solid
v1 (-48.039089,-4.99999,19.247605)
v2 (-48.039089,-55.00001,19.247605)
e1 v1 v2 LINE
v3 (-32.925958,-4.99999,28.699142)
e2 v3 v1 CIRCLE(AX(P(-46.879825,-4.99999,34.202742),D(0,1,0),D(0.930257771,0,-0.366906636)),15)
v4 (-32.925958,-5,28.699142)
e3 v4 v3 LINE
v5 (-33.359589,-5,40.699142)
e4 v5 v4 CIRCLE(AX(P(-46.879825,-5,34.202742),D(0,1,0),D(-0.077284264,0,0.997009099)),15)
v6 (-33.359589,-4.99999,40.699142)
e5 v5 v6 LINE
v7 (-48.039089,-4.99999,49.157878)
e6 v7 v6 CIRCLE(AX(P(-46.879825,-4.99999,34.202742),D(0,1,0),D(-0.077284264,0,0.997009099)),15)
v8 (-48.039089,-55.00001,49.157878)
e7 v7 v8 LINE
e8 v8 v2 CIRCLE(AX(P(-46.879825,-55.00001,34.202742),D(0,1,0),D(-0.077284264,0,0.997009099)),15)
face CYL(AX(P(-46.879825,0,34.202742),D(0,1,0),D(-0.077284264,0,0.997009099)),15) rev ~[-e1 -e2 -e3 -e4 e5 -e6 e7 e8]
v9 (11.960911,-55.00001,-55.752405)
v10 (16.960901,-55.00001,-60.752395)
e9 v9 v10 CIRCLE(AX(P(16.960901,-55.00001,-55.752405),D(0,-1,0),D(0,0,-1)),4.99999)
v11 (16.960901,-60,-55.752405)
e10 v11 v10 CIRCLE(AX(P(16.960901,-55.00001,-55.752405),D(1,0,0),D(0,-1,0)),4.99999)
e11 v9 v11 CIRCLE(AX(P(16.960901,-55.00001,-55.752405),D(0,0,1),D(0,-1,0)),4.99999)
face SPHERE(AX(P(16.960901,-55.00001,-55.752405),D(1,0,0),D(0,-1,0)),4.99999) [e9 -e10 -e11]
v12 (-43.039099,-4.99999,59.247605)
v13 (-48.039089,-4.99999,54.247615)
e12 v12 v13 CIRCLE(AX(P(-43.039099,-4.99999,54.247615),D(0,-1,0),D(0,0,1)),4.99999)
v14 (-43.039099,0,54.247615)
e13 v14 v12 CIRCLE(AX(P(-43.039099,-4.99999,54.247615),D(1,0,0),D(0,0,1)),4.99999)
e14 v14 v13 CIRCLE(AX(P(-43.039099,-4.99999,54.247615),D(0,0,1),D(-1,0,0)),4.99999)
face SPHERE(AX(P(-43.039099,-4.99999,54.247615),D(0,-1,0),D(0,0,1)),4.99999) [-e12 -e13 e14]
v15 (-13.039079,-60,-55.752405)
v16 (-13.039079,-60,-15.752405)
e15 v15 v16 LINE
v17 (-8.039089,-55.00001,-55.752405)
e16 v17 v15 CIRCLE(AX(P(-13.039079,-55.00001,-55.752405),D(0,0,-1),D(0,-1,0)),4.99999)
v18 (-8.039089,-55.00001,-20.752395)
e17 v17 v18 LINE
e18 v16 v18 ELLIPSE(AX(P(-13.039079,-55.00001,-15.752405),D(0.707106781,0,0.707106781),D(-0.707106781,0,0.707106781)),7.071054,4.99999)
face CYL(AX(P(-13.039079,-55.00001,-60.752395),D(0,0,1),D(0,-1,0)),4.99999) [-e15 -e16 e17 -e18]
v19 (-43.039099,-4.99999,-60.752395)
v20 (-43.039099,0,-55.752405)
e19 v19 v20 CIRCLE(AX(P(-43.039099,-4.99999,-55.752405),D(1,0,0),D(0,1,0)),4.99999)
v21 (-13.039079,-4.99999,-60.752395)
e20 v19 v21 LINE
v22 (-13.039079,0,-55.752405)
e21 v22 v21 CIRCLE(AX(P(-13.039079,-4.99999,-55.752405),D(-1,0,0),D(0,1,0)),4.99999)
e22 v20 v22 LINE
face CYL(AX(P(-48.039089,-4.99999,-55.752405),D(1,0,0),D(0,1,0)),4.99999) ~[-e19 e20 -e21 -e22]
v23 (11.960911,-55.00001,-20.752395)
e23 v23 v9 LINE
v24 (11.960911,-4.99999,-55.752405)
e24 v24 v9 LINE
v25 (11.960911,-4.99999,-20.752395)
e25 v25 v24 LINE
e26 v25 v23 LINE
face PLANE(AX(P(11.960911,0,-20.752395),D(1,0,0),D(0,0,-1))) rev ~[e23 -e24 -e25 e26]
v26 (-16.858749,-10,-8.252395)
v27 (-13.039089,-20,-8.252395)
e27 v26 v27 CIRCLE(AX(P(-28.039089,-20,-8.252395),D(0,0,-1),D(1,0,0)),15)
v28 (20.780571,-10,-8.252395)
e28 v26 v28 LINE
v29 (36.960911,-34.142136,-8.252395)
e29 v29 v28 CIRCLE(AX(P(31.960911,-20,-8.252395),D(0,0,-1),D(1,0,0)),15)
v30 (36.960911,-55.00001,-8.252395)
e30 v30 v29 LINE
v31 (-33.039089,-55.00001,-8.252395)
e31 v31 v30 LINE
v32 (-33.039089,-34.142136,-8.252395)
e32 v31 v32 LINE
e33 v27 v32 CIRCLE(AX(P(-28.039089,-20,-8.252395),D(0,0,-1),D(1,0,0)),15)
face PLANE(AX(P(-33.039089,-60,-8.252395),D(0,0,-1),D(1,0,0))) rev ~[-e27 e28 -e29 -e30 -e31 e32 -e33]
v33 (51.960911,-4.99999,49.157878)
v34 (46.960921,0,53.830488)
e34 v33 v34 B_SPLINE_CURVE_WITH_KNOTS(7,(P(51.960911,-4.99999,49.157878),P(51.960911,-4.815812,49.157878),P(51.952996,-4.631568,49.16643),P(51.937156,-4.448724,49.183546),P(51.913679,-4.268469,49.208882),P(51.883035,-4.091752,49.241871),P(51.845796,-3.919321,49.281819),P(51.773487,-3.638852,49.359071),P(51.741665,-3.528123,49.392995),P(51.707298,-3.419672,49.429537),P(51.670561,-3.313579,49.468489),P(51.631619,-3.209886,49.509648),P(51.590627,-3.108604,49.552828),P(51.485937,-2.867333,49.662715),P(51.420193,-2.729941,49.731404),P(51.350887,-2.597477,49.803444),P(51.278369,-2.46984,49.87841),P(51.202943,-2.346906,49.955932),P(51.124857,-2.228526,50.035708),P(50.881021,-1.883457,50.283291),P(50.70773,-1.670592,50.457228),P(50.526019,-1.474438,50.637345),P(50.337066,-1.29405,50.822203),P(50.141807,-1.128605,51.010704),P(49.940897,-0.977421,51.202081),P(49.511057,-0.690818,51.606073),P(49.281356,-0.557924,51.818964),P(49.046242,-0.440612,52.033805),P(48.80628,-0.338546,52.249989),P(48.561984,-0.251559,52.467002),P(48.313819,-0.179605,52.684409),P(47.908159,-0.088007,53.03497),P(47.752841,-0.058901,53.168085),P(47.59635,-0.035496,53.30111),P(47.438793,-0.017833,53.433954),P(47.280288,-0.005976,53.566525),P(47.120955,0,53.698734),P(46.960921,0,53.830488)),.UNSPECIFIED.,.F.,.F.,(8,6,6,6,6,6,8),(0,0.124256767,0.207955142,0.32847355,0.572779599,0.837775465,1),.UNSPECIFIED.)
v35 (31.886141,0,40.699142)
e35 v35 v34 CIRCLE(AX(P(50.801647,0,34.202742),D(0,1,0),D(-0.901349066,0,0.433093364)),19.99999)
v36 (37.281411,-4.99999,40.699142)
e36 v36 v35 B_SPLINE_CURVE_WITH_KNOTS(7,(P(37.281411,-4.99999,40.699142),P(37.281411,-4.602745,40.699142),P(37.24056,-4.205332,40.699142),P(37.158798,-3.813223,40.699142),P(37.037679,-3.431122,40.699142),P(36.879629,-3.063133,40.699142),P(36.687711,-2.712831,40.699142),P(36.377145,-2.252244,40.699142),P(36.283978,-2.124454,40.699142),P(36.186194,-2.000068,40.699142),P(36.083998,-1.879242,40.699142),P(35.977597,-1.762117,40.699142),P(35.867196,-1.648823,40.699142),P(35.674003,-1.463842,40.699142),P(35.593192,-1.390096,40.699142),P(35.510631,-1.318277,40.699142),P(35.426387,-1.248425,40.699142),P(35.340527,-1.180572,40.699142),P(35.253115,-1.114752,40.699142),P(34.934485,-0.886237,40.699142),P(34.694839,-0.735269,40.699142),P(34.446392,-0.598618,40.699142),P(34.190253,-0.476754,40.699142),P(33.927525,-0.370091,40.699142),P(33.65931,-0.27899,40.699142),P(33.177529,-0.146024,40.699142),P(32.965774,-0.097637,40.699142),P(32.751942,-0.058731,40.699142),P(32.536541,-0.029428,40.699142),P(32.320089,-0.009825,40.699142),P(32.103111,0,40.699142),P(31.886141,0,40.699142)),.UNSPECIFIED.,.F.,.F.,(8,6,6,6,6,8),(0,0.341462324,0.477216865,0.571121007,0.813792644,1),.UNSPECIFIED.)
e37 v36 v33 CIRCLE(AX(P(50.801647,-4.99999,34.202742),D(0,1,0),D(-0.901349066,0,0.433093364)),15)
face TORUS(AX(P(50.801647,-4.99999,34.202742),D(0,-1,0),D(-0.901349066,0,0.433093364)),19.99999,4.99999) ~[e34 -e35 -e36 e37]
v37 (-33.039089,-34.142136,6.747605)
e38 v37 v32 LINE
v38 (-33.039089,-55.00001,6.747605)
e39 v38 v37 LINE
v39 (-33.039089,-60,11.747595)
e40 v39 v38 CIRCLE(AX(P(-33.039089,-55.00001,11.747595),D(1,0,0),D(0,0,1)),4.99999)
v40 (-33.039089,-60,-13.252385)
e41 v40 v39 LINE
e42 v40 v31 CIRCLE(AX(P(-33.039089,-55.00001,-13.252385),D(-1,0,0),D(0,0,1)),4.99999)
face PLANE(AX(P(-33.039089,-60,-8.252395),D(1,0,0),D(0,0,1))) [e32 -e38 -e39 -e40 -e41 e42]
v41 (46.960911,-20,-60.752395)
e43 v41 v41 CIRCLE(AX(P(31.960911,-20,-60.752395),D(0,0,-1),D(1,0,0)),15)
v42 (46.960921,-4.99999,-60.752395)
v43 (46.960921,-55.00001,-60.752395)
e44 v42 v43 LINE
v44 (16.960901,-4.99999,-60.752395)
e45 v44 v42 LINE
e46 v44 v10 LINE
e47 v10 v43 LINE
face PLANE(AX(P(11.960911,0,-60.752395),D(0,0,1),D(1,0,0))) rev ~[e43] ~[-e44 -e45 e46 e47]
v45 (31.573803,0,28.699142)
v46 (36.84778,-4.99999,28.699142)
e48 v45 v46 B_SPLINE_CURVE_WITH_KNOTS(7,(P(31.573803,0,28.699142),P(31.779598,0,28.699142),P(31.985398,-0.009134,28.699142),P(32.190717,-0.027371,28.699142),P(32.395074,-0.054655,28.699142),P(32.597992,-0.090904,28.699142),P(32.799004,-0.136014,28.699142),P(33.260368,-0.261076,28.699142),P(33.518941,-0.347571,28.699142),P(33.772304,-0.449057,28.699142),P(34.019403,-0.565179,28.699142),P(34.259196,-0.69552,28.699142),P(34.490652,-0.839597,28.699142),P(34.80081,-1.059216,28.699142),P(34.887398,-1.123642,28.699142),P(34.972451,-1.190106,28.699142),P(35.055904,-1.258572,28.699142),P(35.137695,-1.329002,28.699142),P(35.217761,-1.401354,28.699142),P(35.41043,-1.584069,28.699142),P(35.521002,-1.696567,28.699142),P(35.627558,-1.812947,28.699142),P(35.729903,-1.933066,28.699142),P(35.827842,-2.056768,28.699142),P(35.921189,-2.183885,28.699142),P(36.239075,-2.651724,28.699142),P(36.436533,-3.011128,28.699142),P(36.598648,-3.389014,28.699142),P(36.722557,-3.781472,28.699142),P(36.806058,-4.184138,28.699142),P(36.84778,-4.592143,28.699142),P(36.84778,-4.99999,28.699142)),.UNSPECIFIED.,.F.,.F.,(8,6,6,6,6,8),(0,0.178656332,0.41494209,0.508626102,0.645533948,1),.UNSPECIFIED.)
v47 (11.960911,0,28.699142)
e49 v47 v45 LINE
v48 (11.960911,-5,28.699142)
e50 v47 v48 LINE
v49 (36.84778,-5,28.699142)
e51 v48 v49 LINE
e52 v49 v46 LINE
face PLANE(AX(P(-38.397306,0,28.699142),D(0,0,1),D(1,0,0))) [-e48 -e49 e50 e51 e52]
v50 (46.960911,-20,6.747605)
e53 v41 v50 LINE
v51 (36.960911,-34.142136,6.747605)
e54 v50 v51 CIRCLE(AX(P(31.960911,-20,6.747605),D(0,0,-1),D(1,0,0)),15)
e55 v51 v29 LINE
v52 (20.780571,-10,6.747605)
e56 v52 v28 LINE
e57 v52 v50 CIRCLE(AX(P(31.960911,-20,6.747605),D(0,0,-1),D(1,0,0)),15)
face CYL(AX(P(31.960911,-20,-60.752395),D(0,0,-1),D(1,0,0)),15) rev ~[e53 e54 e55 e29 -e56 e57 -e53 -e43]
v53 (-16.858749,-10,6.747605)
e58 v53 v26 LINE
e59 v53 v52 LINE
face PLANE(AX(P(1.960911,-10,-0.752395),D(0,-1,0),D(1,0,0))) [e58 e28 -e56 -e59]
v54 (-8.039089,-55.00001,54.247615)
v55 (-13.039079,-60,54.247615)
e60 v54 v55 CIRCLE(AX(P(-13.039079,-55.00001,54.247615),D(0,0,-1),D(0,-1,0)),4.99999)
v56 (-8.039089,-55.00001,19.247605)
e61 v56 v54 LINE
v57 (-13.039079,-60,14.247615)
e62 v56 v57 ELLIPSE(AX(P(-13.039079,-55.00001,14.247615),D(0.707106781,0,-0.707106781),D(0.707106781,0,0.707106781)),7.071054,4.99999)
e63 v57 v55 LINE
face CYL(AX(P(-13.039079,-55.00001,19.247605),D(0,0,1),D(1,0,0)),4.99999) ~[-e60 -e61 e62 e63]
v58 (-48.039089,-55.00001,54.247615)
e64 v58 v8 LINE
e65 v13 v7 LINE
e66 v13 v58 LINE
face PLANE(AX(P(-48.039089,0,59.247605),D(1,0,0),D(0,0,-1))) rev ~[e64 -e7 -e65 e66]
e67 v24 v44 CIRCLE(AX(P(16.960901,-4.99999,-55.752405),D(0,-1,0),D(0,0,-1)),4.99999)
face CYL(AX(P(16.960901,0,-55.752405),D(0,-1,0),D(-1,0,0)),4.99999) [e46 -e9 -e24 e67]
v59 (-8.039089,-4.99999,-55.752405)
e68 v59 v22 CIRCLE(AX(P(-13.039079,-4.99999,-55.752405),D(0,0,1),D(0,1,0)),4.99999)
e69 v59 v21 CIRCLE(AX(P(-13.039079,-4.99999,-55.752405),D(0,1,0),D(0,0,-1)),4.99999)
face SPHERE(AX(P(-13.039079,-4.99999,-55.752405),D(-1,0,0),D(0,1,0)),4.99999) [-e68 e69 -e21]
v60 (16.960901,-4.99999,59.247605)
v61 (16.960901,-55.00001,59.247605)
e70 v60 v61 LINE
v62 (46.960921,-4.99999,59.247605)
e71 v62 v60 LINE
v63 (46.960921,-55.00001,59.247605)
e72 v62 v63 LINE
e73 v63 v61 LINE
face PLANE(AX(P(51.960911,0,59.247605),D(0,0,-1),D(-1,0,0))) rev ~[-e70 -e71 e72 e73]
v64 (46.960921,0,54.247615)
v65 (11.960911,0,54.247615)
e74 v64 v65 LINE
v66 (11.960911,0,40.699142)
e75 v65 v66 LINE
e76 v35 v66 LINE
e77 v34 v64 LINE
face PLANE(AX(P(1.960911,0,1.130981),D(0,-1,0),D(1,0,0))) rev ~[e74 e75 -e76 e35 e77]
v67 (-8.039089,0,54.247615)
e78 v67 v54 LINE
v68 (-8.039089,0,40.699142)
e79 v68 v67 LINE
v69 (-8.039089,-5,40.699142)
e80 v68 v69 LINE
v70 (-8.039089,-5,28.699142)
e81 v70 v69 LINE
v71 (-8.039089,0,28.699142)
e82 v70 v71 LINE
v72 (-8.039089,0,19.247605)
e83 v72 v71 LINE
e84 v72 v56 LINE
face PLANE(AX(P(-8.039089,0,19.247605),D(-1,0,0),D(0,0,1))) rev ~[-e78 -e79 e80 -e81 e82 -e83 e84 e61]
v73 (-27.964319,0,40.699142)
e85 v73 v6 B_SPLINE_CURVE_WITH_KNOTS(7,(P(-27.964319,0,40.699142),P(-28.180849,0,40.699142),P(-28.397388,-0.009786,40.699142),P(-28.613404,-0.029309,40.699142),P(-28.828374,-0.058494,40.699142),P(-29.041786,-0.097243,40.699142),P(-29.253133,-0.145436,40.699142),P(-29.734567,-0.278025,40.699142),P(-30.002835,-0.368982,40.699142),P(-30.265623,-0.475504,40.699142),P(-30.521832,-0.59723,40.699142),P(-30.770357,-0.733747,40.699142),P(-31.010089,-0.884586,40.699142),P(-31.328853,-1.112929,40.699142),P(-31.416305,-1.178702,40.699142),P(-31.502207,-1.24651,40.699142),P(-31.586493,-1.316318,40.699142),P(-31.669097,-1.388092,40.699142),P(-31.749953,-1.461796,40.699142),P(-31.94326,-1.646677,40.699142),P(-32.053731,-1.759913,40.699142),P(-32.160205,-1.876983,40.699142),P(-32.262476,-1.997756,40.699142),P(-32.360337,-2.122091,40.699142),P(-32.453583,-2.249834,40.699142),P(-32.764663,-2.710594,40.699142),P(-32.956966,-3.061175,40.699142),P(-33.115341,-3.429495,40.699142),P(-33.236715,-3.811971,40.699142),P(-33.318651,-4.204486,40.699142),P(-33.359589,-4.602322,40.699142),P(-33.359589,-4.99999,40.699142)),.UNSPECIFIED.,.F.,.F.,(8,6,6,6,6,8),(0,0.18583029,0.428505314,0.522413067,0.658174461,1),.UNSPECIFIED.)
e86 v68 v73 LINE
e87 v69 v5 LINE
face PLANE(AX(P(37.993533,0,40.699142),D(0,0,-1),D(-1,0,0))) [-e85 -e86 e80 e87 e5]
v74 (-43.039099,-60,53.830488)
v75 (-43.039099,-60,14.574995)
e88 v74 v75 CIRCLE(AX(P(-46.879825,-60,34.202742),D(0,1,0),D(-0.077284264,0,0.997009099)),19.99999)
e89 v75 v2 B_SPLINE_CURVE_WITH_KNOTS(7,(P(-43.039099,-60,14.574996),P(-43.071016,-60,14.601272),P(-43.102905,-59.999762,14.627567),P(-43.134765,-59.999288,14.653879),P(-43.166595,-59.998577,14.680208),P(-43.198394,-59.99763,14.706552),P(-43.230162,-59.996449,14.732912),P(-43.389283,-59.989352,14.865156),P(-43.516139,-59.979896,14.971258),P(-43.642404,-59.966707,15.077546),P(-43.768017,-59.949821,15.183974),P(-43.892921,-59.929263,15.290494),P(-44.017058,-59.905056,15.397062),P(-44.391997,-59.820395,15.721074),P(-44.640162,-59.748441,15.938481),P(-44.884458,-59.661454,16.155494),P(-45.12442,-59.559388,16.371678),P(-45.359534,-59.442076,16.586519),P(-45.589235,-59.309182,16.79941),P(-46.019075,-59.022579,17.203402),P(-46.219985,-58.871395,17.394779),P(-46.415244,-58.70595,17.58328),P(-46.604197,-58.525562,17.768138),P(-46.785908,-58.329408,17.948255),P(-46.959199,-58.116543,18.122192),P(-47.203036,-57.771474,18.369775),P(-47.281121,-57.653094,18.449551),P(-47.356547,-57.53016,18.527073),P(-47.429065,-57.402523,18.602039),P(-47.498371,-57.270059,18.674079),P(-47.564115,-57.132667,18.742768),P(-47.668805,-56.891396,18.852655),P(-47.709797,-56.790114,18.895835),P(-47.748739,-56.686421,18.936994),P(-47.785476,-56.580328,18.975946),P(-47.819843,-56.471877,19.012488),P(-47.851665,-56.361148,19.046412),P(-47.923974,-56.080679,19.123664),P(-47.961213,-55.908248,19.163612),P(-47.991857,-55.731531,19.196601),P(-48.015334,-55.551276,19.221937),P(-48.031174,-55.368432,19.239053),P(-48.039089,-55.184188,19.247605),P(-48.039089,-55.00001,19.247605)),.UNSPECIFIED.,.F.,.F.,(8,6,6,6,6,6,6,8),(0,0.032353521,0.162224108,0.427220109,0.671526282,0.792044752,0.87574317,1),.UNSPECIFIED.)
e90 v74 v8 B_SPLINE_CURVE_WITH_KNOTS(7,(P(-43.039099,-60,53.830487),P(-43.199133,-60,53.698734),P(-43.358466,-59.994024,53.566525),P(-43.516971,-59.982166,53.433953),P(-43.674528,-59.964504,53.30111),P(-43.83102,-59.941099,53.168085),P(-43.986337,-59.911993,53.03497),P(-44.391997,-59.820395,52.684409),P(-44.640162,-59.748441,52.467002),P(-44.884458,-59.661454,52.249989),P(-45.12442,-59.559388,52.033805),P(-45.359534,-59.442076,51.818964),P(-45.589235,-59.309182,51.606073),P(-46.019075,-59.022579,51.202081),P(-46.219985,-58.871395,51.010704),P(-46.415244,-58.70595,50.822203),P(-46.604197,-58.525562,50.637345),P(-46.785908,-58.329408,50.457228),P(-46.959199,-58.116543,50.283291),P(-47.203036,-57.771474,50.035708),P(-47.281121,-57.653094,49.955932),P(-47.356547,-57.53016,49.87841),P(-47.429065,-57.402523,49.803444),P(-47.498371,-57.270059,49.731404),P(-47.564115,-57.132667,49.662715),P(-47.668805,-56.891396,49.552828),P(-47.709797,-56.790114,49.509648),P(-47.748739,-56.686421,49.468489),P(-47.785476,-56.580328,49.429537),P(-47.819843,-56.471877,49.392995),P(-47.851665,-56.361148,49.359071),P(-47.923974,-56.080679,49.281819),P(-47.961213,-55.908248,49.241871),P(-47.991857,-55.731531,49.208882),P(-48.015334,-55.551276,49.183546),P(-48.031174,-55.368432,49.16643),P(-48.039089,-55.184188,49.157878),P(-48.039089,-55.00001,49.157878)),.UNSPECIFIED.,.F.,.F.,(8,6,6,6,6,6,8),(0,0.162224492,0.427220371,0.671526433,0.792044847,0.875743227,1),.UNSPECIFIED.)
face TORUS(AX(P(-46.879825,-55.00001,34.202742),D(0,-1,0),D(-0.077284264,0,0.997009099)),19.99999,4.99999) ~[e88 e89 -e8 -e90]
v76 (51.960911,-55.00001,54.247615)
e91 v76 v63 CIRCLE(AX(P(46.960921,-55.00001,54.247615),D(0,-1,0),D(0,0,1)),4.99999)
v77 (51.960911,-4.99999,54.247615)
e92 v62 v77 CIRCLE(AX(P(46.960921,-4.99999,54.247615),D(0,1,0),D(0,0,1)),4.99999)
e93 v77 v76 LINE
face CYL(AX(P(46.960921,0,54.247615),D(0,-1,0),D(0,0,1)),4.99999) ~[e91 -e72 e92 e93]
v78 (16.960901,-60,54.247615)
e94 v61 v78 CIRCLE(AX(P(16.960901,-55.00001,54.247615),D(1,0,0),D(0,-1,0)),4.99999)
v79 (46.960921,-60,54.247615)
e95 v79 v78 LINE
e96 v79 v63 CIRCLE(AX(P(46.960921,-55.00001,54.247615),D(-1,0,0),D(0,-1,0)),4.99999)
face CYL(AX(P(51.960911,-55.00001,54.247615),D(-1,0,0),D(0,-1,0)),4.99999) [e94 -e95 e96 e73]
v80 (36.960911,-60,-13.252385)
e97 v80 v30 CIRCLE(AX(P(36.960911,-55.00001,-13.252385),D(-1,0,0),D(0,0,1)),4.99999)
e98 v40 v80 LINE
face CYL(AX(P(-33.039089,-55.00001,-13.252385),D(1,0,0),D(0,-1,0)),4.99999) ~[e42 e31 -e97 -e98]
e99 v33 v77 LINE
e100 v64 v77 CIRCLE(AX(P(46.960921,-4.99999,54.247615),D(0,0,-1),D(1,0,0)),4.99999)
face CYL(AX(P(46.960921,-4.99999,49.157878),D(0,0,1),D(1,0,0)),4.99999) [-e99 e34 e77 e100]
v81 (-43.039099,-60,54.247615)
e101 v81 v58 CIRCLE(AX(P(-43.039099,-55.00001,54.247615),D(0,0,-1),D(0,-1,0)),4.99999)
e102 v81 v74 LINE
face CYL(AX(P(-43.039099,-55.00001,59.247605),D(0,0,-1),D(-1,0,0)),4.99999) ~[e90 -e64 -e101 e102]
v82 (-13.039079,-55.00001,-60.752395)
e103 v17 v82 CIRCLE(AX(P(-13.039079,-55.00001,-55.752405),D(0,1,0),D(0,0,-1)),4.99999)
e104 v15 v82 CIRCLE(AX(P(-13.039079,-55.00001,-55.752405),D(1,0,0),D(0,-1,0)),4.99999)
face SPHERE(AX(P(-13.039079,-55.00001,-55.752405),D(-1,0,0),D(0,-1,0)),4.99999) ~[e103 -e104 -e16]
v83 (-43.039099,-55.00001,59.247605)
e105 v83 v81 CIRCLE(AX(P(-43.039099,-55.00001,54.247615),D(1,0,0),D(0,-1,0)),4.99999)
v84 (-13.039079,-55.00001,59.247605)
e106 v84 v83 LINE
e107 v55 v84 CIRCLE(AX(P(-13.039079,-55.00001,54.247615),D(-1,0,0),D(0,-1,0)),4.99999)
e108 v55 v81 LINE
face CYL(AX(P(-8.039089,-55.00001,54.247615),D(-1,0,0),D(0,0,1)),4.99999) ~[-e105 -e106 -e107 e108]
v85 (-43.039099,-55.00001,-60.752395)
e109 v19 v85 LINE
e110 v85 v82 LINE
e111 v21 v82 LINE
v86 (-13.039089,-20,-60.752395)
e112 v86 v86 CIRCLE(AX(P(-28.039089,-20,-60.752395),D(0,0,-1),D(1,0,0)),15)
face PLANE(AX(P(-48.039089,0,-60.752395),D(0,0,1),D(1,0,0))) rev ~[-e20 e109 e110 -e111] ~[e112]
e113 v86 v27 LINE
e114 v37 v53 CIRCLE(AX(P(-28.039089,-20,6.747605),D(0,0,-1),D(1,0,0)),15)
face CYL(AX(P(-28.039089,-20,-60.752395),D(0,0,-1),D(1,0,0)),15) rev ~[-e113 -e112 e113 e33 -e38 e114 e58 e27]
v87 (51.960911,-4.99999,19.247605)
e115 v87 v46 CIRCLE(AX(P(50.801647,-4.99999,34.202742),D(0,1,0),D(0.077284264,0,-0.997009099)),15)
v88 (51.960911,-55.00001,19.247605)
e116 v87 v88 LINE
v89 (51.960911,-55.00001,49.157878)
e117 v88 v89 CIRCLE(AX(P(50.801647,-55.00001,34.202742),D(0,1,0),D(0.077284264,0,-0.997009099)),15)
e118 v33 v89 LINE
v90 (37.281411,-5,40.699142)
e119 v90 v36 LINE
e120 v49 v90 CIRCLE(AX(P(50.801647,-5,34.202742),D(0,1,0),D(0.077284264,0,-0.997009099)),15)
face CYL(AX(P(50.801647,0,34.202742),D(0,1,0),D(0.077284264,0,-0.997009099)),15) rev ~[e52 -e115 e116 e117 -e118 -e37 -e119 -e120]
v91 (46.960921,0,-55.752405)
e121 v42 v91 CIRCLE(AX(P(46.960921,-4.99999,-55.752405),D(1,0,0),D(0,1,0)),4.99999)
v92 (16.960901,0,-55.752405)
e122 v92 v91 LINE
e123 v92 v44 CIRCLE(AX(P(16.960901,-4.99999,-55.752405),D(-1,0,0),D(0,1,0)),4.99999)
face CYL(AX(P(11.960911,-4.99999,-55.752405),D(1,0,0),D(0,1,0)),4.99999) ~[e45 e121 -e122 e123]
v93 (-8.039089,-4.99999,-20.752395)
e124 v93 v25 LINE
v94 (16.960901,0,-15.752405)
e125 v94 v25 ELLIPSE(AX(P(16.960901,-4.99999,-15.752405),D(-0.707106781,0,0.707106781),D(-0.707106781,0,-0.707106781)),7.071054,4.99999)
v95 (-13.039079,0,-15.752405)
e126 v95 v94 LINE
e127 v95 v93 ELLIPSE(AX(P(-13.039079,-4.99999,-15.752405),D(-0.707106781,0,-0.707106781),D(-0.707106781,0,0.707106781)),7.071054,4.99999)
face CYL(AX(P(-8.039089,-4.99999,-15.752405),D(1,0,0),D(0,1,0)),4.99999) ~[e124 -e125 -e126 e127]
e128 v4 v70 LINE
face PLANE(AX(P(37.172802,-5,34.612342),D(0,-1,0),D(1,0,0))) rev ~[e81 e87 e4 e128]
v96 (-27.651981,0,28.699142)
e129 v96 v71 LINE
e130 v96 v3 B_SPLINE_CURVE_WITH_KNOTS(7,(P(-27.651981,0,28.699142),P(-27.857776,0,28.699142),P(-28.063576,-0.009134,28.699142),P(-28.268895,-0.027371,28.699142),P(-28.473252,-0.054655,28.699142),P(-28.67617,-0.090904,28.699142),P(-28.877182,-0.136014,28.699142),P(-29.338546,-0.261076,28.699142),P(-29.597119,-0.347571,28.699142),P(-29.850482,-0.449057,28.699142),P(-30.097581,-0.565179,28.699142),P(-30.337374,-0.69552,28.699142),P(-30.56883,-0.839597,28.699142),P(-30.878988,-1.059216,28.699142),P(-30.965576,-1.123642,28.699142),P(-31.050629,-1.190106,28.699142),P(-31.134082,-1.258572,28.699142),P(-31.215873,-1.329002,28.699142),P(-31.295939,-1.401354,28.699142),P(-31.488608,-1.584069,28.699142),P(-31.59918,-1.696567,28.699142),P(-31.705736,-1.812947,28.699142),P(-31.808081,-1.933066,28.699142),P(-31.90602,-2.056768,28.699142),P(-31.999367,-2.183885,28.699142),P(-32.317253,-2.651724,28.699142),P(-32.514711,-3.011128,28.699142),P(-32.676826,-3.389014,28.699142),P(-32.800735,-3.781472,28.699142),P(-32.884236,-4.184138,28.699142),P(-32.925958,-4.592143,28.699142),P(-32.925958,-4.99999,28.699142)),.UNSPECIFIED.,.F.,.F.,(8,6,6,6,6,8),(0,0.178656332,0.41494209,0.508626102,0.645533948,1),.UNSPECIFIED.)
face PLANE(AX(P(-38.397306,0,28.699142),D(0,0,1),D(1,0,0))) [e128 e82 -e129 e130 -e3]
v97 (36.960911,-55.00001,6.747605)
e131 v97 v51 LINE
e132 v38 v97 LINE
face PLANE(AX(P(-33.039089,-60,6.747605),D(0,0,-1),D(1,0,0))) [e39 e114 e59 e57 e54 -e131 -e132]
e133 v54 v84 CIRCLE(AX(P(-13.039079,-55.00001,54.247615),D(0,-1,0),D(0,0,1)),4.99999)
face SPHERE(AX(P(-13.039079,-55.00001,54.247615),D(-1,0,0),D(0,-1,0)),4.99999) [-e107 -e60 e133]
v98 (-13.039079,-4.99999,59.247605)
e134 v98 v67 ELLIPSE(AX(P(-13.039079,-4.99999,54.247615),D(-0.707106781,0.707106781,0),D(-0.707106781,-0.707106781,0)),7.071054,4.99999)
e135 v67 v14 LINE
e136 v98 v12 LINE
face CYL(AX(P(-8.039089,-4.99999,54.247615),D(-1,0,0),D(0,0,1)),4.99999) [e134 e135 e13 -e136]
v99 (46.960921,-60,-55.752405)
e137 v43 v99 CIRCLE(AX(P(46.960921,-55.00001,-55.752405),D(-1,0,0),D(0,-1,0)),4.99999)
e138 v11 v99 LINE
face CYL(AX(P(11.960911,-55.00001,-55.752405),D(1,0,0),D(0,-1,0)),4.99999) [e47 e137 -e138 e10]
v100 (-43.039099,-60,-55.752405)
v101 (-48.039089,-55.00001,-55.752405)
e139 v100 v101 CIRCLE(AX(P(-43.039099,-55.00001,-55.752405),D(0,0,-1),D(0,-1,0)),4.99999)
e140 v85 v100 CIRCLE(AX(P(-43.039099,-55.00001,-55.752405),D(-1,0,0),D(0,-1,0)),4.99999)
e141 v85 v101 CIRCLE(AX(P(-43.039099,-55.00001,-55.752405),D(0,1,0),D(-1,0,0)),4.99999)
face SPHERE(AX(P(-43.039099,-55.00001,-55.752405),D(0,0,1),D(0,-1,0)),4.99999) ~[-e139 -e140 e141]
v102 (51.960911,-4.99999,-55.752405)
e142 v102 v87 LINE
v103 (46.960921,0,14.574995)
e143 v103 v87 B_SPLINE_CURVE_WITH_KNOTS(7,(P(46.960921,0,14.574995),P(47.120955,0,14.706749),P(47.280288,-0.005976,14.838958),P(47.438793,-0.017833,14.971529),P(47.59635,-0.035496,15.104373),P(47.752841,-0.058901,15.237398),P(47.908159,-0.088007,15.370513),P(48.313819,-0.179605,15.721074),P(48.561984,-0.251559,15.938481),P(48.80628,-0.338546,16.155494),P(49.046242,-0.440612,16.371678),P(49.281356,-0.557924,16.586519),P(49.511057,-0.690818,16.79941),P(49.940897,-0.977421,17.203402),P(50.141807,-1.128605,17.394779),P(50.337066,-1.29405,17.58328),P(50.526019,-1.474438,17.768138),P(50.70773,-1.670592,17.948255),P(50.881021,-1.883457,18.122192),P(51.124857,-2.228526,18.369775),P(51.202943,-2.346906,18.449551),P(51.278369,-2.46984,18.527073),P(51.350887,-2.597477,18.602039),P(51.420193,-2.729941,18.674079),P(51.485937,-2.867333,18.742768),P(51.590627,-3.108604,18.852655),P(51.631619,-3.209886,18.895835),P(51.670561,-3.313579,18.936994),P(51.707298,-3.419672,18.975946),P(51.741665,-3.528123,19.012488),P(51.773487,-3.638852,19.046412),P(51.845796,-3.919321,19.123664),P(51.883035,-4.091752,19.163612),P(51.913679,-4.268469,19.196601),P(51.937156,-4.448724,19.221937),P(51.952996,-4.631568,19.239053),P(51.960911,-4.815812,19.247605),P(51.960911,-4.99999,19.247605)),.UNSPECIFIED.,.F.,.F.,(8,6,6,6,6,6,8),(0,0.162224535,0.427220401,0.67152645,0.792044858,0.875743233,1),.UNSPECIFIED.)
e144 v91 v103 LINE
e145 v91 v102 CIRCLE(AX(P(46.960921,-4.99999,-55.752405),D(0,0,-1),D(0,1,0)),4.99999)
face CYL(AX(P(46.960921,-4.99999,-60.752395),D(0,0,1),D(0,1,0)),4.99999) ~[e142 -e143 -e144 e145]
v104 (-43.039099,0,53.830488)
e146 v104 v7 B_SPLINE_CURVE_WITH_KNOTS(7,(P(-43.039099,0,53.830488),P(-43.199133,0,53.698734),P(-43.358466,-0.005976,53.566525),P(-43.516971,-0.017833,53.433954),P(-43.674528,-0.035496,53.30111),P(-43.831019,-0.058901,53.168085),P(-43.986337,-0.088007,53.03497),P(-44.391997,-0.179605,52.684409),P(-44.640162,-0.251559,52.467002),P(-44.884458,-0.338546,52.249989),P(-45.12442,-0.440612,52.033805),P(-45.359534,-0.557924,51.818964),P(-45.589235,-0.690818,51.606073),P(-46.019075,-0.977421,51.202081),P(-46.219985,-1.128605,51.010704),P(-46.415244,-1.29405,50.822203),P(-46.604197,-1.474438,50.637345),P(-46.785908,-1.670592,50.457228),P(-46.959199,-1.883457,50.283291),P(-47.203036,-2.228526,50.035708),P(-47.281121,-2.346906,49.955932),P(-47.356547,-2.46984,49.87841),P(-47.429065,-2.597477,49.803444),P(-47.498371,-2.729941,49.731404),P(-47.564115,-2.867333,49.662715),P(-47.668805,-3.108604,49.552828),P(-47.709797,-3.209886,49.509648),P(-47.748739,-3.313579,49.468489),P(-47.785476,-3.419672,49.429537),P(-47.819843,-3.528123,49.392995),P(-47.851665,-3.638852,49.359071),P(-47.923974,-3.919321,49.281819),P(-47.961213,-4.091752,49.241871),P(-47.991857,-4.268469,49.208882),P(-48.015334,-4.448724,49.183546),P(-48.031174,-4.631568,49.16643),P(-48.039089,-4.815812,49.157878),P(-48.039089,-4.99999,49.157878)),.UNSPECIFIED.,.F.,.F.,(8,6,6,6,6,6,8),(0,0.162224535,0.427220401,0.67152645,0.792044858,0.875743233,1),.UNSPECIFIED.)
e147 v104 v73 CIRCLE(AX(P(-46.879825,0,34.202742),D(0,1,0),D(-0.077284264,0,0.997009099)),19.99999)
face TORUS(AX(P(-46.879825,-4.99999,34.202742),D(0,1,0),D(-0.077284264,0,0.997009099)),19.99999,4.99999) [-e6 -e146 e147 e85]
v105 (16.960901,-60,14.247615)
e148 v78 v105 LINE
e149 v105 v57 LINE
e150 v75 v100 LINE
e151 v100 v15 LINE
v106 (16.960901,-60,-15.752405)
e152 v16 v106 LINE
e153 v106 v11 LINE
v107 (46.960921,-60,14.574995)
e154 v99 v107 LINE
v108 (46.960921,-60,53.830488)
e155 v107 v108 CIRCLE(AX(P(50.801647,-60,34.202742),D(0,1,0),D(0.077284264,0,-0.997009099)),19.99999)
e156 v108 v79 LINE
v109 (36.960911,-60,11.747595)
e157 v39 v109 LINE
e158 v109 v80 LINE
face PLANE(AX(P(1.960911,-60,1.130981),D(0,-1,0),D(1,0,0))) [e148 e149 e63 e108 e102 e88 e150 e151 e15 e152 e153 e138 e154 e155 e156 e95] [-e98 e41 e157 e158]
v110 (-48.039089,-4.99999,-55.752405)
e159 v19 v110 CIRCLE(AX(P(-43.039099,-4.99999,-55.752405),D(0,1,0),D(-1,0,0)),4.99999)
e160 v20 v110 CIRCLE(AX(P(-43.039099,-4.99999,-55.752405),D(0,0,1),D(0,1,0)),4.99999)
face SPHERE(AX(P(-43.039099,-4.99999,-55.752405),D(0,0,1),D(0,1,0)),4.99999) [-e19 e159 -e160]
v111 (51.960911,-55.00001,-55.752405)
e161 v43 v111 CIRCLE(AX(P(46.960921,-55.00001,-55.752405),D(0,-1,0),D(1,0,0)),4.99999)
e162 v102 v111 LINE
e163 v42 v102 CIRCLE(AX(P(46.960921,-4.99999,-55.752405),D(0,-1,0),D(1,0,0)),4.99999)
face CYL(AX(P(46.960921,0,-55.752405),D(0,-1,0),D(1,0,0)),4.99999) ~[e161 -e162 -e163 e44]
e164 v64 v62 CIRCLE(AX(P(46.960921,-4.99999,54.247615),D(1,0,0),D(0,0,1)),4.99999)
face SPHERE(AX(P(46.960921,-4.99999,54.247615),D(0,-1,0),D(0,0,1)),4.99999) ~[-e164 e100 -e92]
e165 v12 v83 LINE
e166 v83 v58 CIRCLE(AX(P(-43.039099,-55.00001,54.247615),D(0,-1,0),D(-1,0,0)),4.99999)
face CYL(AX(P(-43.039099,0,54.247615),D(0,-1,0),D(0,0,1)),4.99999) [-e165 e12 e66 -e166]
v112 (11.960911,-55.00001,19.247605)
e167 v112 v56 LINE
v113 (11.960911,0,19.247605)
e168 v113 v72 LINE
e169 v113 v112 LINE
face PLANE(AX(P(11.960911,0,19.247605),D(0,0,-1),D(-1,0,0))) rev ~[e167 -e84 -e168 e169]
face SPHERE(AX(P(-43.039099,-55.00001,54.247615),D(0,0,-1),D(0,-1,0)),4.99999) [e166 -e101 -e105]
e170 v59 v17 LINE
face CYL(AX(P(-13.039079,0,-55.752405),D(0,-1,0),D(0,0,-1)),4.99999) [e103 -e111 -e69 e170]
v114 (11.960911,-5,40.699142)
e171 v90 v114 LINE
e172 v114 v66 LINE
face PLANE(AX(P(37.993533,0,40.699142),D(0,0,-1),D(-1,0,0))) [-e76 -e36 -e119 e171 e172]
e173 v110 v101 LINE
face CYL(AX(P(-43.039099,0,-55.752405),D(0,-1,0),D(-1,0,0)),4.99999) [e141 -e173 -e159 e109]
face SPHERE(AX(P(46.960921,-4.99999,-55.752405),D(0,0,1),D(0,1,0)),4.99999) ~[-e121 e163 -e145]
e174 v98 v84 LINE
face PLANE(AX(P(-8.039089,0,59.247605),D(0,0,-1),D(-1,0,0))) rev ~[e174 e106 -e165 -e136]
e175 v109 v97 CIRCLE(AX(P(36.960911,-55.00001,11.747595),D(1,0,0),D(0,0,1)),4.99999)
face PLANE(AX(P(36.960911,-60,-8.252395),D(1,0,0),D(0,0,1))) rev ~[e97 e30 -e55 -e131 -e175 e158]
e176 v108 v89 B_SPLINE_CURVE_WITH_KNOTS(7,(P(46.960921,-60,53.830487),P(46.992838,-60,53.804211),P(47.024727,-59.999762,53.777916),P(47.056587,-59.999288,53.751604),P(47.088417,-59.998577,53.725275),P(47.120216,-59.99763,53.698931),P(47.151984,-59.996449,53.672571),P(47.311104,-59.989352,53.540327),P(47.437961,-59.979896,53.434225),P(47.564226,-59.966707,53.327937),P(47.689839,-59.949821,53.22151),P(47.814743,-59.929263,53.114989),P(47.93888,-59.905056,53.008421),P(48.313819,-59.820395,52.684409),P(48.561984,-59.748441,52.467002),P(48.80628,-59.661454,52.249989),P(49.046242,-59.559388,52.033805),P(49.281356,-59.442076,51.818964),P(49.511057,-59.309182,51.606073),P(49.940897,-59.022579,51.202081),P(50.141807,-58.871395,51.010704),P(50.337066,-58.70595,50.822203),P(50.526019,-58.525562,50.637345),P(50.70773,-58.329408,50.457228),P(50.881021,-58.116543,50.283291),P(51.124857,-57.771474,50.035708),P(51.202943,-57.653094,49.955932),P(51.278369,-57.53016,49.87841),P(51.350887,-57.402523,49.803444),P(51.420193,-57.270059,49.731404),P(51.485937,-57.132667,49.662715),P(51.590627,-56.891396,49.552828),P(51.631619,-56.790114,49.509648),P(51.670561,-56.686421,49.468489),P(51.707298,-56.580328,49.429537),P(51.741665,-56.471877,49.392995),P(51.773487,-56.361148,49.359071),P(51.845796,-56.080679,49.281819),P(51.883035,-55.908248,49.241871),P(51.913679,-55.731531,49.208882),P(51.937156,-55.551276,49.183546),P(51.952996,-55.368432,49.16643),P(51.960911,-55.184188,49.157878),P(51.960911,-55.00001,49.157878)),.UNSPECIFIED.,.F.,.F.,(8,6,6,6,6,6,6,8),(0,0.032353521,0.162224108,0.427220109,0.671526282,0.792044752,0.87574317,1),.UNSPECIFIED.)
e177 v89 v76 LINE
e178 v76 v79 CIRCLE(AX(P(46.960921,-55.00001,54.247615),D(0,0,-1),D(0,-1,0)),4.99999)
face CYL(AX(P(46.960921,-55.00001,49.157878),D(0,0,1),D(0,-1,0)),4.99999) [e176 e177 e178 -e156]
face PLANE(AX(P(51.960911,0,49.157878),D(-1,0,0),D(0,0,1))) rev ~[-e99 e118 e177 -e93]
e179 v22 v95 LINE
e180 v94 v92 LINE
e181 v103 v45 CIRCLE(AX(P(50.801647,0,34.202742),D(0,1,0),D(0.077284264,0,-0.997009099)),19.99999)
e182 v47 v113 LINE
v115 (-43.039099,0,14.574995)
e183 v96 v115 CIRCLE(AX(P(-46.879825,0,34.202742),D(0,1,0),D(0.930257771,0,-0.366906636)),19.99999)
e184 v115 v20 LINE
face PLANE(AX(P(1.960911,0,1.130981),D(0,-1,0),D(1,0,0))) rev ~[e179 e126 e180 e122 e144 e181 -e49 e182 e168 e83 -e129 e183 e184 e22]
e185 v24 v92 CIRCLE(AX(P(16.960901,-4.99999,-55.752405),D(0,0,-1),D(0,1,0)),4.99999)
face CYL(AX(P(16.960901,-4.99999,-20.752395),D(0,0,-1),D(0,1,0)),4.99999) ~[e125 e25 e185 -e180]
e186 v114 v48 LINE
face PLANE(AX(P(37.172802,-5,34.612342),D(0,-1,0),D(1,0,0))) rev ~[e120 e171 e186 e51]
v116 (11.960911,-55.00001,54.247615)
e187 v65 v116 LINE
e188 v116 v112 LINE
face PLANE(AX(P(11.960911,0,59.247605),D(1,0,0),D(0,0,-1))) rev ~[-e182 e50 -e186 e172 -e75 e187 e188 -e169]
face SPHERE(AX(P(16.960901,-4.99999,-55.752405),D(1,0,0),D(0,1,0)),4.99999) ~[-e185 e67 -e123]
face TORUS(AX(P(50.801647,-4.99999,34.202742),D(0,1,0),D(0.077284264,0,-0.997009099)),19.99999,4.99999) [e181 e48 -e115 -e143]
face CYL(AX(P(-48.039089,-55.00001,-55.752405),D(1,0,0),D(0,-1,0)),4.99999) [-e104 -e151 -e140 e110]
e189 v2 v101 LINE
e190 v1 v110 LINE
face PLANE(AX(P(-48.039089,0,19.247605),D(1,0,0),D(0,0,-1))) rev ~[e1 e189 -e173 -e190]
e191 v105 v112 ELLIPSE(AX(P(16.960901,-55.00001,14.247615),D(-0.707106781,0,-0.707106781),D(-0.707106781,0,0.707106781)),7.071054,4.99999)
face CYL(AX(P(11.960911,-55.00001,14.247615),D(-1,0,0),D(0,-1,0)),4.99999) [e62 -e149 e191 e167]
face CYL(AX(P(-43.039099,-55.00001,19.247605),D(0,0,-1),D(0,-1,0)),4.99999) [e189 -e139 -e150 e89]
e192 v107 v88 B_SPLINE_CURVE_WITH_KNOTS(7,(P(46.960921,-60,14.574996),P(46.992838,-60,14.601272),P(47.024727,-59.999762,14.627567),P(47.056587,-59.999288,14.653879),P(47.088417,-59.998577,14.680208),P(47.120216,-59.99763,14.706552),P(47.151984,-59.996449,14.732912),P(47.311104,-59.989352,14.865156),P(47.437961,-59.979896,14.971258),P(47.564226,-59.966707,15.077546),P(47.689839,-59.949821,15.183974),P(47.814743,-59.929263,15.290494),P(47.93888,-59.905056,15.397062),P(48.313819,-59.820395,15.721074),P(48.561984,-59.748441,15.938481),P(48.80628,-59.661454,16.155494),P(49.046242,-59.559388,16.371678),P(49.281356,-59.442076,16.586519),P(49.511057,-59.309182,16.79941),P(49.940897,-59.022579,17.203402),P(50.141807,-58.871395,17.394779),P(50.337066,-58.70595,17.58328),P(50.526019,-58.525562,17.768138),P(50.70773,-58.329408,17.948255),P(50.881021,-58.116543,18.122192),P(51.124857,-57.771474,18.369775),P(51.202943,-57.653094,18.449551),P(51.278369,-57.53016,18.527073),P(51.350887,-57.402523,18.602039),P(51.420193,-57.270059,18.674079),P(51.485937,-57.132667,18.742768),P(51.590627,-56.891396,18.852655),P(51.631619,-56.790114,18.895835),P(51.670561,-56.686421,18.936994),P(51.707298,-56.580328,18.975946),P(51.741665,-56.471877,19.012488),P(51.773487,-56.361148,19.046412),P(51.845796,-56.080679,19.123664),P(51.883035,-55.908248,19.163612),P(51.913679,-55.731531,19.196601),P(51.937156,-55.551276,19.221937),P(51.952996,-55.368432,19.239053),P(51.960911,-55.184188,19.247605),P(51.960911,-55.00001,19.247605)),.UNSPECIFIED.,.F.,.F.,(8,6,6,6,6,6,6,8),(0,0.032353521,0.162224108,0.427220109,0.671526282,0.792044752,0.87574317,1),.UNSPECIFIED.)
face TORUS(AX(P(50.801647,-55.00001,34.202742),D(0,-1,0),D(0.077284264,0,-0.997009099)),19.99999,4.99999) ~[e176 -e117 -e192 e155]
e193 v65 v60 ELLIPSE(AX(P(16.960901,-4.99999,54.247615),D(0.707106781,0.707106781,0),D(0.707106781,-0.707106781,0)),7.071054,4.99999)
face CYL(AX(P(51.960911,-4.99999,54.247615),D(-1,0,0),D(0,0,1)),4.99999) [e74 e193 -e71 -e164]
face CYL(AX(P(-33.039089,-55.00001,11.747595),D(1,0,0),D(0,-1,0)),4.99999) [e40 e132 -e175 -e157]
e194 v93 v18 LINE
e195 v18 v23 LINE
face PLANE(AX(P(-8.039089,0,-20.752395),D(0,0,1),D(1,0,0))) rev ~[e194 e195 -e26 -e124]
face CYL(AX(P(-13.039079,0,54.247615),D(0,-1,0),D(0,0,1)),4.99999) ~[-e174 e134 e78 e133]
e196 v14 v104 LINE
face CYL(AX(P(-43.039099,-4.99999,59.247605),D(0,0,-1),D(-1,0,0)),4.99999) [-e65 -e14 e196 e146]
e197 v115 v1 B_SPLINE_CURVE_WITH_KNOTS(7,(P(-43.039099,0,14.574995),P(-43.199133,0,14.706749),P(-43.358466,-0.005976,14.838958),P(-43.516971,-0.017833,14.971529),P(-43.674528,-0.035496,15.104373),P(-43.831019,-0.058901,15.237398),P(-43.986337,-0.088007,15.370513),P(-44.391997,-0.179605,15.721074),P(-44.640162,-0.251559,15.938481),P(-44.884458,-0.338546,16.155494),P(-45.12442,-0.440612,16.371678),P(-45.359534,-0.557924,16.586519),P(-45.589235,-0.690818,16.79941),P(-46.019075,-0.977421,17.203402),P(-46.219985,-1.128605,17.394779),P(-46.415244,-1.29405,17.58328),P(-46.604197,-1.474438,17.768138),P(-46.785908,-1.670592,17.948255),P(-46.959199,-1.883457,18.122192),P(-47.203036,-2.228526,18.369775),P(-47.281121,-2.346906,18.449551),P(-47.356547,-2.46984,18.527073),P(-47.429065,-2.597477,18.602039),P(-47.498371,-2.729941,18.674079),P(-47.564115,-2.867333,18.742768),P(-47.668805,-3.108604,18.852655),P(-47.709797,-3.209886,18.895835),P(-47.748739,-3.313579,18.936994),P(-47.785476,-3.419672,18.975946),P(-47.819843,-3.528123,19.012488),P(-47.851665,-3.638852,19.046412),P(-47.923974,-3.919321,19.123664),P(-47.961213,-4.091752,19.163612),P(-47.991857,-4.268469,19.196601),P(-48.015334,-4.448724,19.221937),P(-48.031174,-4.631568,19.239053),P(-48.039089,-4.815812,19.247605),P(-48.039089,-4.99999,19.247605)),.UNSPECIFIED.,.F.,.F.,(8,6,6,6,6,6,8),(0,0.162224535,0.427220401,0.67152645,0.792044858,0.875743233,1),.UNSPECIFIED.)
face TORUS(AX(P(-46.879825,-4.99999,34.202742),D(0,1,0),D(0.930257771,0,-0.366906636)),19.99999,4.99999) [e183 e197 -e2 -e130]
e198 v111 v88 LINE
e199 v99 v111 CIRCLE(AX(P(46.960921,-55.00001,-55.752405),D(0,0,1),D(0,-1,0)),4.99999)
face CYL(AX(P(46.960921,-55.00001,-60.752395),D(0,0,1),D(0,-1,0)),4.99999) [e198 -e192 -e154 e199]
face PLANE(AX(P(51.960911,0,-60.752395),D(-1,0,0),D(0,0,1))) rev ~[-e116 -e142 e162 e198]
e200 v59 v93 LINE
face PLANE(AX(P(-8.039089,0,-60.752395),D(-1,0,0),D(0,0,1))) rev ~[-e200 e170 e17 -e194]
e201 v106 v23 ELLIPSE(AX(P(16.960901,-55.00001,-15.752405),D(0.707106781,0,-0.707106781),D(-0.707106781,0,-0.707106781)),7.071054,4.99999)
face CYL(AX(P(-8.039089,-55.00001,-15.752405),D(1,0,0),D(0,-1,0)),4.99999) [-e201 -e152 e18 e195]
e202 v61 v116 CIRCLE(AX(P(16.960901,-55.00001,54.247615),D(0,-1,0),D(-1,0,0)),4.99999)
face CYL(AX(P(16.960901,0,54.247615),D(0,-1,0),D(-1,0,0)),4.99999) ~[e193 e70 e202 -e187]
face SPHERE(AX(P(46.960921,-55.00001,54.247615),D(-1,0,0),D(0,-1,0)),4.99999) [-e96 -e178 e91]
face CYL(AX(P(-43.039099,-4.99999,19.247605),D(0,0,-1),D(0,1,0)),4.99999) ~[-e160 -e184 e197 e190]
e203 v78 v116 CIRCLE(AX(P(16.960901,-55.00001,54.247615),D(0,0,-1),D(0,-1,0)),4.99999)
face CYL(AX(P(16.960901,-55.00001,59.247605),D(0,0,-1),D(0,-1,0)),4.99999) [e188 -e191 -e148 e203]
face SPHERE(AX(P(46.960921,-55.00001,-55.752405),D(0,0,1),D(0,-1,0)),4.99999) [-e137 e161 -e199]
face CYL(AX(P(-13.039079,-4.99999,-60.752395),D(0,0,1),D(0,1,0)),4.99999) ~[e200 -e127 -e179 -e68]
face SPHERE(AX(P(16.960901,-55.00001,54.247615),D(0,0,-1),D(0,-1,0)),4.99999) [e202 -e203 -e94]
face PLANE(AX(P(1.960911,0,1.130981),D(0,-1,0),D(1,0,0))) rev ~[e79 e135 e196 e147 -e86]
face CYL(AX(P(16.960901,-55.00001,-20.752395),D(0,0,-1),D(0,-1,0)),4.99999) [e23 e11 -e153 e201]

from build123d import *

# Parameters (mm, degrees)
F1_DEPTH = 60
F2_W     = 70
F2_H     = 15
F3_DEPTH = 50
F4_R     = 15
F5_R     = 15
F6_DEPTH = 67.5
F7_W     = 20
F7_H     = 12
F8_DEPTH = 5
F9_R     = 4.99999


# Not quite as in the source:
# - a fillet or chamfer is up to 0.001 mm smaller than in the source, because OpenCascade refuses the exact size


with BuildPart() as f1:
    # F0 (on Front) → F1 (new body)
    with BuildSketch(Plane.XZ):
        with BuildLine():
            Line((-8.0390890029, 59.2476050396), (-48.0390890029, 59.2476050396))
            Line((-48.0390890029, 59.2476050396), (-48.0390890029, 49.1578779955))
            ThreePointArc((-48.0390890029, 49.1578779955), (-31.8798250439, 34.2027415175), (-48.0390890029, 19.2476050396))
            Line((-48.0390890029, 19.2476050396), (-48.0390890029, -60.7523949604))
            Line((-48.0390890029, -60.7523949604), (-8.0390890029, -60.7523949604))
            Line((-8.0390890029, -60.7523949604), (-8.0390890029, -20.7523949604))
            Line((-8.0390890029, -20.7523949604), (11.9609109971, -20.7523949604))
            Line((11.9609109971, -20.7523949604), (11.9609109971, -60.7523949604))
            Line((11.9609109971, -60.7523949604), (51.9609109971, -60.7523949604))
            Line((51.9609109971, -60.7523949604), (51.9609109971, 19.2476050396))
            ThreePointArc((51.9609109971, 19.2476050396), (35.8016470382, 34.2027415175), (51.9609109971, 49.1578779955))
            Line((51.9609109971, 49.1578779955), (51.9609109971, 59.2476050396))
            Line((51.9609109971, 59.2476050396), (11.9609109971, 59.2476050396))
            Line((11.9609109971, 59.2476050396), (11.9609109971, 19.2476050396))
            Line((11.9609109971, 19.2476050396), (-8.0390890029, 19.2476050396))
            Line((-8.0390890029, 19.2476050396), (-8.0390890029, 59.2476050396))
        make_face()
    extrude(amount=F1_DEPTH)

    # F2 (on face) → F3 (cut)
    with BuildSketch(Plane.XZ.offset(60)):
        with Locations((1.9609109971, -0.7523949604)):
            Rectangle(F2_W, F2_H)
    extrude(amount=-F3_DEPTH, mode=Mode.SUBTRACT)

    # F4 (on face) + F5 (on face) → F6 (cut)
    with BuildSketch(Plane(origin=(0, 0, -60.7523949604), x_dir=(1, 0, 0), z_dir=(0, 0, -1))):
        with Locations((-28.0390890029, 20)):
            Circle(F4_R)
    with BuildSketch(Plane(origin=(0, 0, -60.7523949604), x_dir=(1, 0, 0), z_dir=(0, 0, -1))):
        with Locations((31.9609109971, 20)):
            Circle(F5_R)
    extrude(amount=-F6_DEPTH, mode=Mode.SUBTRACT)

    # F7 (on face) → F8 (cut)
    with BuildSketch(Plane.XZ):
        with BuildLine():
            Line((37.9935329711, 28.6991419792), (37.9935329711, 40.6991419792))
            Line((37.9935329711, 40.6991419792), (37.281411055, 40.6991419792))
            ThreePointArc((37.281411055, 40.6991419792), (35.811430972, 34.7444261941), (36.8477804729, 28.6991419792))
            Line((36.8477804729, 28.6991419792), (37.9935329711, 28.6991419792))
        make_face()
        with Locations((1.9609109971, 34.6991419792)):
            Rectangle(F7_W, F7_H)
        with BuildLine():
            Line((-8.0390890029, 28.6991419792), (-8.0390890029, 40.6991419792))
            Line((-8.0390890029, 40.6991419792), (-33.3595890607, 40.6991419792))
            ThreePointArc((-33.3595890607, 40.6991419792), (-31.8896089777, 34.7444261941), (-32.9259584786, 28.6991419792))
            Line((-32.9259584786, 28.6991419792), (-8.0390890029, 28.6991419792))
        make_face()
        with BuildLine():
            ThreePointArc((-32.9259584786, 28.6991419792), (-31.8896089777, 34.7444261941), (-33.3595890607, 40.6991419792))
            Line((-33.3595890607, 40.6991419792), (-38.3973060106, 40.6991419792))
            Line((-38.3973060106, 40.6991419792), (-38.3973060106, 28.6991419792))
            Line((-38.3973060106, 28.6991419792), (-32.9259584786, 28.6991419792))
        make_face()
        with BuildLine():
            ThreePointArc((36.8477804729, 28.6991419792), (35.811430972, 34.7444261941), (37.281411055, 40.6991419792))
            Line((37.281411055, 40.6991419792), (11.9609109971, 40.6991419792))
            Line((11.9609109971, 40.6991419792), (11.9609109971, 28.6991419792))
            Line((11.9609109971, 28.6991419792), (36.8477804729, 28.6991419792))
        make_face()
    extrude(amount=F8_DEPTH, mode=Mode.SUBTRACT)

    # F9 (radius 5 in the source; OpenCascade refuses exactly that, so slightly less here)
    f9_edges = [f1.edges().sort_by_distance(p)[0] for p in [
        (-31.879825, -60, 34.202742),
        (-48.039089, -60, 54.202742),
        (-28.039089, -60, 59.247605),
        (-8.039089, -60, 39.247605),
        (1.960911, -60, 19.247605),
        (11.960911, -60, 39.247605),
        (31.960911, -60, 59.247605),
        (51.960911, -60, 54.202742),
        (35.801647, -60, 34.202742),
        (51.960911, -60, -20.752395),
        (-48.039089, -60, -20.752395),
        (-28.039089, -60, -60.752395),
        (31.960911, -60, -60.752395),
        (11.960911, -60, -40.752395),
        (-8.039089, -60, -40.752395),
        (1.960911, -60, -20.752395),
        (1.960911, -60, -8.252395),
        (1.960911, -60, 6.747605),
        (51.960911, -30, 59.247605),
        (11.960911, -30, 59.247605),
        (-8.039089, -30, 59.247605),
        (-48.039089, -30, 59.247605),
        (31.960911, 0, 59.247605),
        (-28.039089, 0, 59.247605),
        (43.312591, 0, 47.199435),
        (42.848135, 0, 21.484973),
        (-38.926313, 0, 21.484973),
        (-39.390769, 0, 47.199435),
        (51.960911, 0, 54.202742),
        (-48.039089, 0, 54.202742),
        (-48.039089, 0, -20.752395),
        (51.960911, 0, -20.752395),
        (-28.039089, 0, -60.752395),
        (31.960911, 0, -60.752395),
        (-8.039089, 0, -40.752395),
        (11.960911, 0, -40.752395),
        (1.960911, 0, -20.752395),
        (11.960911, -30, -60.752395),
        (-8.039089, -30, -60.752395),
        (-48.039089, -30, -60.752395),
        (51.960911, -30, -60.752395),
    ]]
    fillet(f9_edges, radius=F9_R)


solid = f1.part
